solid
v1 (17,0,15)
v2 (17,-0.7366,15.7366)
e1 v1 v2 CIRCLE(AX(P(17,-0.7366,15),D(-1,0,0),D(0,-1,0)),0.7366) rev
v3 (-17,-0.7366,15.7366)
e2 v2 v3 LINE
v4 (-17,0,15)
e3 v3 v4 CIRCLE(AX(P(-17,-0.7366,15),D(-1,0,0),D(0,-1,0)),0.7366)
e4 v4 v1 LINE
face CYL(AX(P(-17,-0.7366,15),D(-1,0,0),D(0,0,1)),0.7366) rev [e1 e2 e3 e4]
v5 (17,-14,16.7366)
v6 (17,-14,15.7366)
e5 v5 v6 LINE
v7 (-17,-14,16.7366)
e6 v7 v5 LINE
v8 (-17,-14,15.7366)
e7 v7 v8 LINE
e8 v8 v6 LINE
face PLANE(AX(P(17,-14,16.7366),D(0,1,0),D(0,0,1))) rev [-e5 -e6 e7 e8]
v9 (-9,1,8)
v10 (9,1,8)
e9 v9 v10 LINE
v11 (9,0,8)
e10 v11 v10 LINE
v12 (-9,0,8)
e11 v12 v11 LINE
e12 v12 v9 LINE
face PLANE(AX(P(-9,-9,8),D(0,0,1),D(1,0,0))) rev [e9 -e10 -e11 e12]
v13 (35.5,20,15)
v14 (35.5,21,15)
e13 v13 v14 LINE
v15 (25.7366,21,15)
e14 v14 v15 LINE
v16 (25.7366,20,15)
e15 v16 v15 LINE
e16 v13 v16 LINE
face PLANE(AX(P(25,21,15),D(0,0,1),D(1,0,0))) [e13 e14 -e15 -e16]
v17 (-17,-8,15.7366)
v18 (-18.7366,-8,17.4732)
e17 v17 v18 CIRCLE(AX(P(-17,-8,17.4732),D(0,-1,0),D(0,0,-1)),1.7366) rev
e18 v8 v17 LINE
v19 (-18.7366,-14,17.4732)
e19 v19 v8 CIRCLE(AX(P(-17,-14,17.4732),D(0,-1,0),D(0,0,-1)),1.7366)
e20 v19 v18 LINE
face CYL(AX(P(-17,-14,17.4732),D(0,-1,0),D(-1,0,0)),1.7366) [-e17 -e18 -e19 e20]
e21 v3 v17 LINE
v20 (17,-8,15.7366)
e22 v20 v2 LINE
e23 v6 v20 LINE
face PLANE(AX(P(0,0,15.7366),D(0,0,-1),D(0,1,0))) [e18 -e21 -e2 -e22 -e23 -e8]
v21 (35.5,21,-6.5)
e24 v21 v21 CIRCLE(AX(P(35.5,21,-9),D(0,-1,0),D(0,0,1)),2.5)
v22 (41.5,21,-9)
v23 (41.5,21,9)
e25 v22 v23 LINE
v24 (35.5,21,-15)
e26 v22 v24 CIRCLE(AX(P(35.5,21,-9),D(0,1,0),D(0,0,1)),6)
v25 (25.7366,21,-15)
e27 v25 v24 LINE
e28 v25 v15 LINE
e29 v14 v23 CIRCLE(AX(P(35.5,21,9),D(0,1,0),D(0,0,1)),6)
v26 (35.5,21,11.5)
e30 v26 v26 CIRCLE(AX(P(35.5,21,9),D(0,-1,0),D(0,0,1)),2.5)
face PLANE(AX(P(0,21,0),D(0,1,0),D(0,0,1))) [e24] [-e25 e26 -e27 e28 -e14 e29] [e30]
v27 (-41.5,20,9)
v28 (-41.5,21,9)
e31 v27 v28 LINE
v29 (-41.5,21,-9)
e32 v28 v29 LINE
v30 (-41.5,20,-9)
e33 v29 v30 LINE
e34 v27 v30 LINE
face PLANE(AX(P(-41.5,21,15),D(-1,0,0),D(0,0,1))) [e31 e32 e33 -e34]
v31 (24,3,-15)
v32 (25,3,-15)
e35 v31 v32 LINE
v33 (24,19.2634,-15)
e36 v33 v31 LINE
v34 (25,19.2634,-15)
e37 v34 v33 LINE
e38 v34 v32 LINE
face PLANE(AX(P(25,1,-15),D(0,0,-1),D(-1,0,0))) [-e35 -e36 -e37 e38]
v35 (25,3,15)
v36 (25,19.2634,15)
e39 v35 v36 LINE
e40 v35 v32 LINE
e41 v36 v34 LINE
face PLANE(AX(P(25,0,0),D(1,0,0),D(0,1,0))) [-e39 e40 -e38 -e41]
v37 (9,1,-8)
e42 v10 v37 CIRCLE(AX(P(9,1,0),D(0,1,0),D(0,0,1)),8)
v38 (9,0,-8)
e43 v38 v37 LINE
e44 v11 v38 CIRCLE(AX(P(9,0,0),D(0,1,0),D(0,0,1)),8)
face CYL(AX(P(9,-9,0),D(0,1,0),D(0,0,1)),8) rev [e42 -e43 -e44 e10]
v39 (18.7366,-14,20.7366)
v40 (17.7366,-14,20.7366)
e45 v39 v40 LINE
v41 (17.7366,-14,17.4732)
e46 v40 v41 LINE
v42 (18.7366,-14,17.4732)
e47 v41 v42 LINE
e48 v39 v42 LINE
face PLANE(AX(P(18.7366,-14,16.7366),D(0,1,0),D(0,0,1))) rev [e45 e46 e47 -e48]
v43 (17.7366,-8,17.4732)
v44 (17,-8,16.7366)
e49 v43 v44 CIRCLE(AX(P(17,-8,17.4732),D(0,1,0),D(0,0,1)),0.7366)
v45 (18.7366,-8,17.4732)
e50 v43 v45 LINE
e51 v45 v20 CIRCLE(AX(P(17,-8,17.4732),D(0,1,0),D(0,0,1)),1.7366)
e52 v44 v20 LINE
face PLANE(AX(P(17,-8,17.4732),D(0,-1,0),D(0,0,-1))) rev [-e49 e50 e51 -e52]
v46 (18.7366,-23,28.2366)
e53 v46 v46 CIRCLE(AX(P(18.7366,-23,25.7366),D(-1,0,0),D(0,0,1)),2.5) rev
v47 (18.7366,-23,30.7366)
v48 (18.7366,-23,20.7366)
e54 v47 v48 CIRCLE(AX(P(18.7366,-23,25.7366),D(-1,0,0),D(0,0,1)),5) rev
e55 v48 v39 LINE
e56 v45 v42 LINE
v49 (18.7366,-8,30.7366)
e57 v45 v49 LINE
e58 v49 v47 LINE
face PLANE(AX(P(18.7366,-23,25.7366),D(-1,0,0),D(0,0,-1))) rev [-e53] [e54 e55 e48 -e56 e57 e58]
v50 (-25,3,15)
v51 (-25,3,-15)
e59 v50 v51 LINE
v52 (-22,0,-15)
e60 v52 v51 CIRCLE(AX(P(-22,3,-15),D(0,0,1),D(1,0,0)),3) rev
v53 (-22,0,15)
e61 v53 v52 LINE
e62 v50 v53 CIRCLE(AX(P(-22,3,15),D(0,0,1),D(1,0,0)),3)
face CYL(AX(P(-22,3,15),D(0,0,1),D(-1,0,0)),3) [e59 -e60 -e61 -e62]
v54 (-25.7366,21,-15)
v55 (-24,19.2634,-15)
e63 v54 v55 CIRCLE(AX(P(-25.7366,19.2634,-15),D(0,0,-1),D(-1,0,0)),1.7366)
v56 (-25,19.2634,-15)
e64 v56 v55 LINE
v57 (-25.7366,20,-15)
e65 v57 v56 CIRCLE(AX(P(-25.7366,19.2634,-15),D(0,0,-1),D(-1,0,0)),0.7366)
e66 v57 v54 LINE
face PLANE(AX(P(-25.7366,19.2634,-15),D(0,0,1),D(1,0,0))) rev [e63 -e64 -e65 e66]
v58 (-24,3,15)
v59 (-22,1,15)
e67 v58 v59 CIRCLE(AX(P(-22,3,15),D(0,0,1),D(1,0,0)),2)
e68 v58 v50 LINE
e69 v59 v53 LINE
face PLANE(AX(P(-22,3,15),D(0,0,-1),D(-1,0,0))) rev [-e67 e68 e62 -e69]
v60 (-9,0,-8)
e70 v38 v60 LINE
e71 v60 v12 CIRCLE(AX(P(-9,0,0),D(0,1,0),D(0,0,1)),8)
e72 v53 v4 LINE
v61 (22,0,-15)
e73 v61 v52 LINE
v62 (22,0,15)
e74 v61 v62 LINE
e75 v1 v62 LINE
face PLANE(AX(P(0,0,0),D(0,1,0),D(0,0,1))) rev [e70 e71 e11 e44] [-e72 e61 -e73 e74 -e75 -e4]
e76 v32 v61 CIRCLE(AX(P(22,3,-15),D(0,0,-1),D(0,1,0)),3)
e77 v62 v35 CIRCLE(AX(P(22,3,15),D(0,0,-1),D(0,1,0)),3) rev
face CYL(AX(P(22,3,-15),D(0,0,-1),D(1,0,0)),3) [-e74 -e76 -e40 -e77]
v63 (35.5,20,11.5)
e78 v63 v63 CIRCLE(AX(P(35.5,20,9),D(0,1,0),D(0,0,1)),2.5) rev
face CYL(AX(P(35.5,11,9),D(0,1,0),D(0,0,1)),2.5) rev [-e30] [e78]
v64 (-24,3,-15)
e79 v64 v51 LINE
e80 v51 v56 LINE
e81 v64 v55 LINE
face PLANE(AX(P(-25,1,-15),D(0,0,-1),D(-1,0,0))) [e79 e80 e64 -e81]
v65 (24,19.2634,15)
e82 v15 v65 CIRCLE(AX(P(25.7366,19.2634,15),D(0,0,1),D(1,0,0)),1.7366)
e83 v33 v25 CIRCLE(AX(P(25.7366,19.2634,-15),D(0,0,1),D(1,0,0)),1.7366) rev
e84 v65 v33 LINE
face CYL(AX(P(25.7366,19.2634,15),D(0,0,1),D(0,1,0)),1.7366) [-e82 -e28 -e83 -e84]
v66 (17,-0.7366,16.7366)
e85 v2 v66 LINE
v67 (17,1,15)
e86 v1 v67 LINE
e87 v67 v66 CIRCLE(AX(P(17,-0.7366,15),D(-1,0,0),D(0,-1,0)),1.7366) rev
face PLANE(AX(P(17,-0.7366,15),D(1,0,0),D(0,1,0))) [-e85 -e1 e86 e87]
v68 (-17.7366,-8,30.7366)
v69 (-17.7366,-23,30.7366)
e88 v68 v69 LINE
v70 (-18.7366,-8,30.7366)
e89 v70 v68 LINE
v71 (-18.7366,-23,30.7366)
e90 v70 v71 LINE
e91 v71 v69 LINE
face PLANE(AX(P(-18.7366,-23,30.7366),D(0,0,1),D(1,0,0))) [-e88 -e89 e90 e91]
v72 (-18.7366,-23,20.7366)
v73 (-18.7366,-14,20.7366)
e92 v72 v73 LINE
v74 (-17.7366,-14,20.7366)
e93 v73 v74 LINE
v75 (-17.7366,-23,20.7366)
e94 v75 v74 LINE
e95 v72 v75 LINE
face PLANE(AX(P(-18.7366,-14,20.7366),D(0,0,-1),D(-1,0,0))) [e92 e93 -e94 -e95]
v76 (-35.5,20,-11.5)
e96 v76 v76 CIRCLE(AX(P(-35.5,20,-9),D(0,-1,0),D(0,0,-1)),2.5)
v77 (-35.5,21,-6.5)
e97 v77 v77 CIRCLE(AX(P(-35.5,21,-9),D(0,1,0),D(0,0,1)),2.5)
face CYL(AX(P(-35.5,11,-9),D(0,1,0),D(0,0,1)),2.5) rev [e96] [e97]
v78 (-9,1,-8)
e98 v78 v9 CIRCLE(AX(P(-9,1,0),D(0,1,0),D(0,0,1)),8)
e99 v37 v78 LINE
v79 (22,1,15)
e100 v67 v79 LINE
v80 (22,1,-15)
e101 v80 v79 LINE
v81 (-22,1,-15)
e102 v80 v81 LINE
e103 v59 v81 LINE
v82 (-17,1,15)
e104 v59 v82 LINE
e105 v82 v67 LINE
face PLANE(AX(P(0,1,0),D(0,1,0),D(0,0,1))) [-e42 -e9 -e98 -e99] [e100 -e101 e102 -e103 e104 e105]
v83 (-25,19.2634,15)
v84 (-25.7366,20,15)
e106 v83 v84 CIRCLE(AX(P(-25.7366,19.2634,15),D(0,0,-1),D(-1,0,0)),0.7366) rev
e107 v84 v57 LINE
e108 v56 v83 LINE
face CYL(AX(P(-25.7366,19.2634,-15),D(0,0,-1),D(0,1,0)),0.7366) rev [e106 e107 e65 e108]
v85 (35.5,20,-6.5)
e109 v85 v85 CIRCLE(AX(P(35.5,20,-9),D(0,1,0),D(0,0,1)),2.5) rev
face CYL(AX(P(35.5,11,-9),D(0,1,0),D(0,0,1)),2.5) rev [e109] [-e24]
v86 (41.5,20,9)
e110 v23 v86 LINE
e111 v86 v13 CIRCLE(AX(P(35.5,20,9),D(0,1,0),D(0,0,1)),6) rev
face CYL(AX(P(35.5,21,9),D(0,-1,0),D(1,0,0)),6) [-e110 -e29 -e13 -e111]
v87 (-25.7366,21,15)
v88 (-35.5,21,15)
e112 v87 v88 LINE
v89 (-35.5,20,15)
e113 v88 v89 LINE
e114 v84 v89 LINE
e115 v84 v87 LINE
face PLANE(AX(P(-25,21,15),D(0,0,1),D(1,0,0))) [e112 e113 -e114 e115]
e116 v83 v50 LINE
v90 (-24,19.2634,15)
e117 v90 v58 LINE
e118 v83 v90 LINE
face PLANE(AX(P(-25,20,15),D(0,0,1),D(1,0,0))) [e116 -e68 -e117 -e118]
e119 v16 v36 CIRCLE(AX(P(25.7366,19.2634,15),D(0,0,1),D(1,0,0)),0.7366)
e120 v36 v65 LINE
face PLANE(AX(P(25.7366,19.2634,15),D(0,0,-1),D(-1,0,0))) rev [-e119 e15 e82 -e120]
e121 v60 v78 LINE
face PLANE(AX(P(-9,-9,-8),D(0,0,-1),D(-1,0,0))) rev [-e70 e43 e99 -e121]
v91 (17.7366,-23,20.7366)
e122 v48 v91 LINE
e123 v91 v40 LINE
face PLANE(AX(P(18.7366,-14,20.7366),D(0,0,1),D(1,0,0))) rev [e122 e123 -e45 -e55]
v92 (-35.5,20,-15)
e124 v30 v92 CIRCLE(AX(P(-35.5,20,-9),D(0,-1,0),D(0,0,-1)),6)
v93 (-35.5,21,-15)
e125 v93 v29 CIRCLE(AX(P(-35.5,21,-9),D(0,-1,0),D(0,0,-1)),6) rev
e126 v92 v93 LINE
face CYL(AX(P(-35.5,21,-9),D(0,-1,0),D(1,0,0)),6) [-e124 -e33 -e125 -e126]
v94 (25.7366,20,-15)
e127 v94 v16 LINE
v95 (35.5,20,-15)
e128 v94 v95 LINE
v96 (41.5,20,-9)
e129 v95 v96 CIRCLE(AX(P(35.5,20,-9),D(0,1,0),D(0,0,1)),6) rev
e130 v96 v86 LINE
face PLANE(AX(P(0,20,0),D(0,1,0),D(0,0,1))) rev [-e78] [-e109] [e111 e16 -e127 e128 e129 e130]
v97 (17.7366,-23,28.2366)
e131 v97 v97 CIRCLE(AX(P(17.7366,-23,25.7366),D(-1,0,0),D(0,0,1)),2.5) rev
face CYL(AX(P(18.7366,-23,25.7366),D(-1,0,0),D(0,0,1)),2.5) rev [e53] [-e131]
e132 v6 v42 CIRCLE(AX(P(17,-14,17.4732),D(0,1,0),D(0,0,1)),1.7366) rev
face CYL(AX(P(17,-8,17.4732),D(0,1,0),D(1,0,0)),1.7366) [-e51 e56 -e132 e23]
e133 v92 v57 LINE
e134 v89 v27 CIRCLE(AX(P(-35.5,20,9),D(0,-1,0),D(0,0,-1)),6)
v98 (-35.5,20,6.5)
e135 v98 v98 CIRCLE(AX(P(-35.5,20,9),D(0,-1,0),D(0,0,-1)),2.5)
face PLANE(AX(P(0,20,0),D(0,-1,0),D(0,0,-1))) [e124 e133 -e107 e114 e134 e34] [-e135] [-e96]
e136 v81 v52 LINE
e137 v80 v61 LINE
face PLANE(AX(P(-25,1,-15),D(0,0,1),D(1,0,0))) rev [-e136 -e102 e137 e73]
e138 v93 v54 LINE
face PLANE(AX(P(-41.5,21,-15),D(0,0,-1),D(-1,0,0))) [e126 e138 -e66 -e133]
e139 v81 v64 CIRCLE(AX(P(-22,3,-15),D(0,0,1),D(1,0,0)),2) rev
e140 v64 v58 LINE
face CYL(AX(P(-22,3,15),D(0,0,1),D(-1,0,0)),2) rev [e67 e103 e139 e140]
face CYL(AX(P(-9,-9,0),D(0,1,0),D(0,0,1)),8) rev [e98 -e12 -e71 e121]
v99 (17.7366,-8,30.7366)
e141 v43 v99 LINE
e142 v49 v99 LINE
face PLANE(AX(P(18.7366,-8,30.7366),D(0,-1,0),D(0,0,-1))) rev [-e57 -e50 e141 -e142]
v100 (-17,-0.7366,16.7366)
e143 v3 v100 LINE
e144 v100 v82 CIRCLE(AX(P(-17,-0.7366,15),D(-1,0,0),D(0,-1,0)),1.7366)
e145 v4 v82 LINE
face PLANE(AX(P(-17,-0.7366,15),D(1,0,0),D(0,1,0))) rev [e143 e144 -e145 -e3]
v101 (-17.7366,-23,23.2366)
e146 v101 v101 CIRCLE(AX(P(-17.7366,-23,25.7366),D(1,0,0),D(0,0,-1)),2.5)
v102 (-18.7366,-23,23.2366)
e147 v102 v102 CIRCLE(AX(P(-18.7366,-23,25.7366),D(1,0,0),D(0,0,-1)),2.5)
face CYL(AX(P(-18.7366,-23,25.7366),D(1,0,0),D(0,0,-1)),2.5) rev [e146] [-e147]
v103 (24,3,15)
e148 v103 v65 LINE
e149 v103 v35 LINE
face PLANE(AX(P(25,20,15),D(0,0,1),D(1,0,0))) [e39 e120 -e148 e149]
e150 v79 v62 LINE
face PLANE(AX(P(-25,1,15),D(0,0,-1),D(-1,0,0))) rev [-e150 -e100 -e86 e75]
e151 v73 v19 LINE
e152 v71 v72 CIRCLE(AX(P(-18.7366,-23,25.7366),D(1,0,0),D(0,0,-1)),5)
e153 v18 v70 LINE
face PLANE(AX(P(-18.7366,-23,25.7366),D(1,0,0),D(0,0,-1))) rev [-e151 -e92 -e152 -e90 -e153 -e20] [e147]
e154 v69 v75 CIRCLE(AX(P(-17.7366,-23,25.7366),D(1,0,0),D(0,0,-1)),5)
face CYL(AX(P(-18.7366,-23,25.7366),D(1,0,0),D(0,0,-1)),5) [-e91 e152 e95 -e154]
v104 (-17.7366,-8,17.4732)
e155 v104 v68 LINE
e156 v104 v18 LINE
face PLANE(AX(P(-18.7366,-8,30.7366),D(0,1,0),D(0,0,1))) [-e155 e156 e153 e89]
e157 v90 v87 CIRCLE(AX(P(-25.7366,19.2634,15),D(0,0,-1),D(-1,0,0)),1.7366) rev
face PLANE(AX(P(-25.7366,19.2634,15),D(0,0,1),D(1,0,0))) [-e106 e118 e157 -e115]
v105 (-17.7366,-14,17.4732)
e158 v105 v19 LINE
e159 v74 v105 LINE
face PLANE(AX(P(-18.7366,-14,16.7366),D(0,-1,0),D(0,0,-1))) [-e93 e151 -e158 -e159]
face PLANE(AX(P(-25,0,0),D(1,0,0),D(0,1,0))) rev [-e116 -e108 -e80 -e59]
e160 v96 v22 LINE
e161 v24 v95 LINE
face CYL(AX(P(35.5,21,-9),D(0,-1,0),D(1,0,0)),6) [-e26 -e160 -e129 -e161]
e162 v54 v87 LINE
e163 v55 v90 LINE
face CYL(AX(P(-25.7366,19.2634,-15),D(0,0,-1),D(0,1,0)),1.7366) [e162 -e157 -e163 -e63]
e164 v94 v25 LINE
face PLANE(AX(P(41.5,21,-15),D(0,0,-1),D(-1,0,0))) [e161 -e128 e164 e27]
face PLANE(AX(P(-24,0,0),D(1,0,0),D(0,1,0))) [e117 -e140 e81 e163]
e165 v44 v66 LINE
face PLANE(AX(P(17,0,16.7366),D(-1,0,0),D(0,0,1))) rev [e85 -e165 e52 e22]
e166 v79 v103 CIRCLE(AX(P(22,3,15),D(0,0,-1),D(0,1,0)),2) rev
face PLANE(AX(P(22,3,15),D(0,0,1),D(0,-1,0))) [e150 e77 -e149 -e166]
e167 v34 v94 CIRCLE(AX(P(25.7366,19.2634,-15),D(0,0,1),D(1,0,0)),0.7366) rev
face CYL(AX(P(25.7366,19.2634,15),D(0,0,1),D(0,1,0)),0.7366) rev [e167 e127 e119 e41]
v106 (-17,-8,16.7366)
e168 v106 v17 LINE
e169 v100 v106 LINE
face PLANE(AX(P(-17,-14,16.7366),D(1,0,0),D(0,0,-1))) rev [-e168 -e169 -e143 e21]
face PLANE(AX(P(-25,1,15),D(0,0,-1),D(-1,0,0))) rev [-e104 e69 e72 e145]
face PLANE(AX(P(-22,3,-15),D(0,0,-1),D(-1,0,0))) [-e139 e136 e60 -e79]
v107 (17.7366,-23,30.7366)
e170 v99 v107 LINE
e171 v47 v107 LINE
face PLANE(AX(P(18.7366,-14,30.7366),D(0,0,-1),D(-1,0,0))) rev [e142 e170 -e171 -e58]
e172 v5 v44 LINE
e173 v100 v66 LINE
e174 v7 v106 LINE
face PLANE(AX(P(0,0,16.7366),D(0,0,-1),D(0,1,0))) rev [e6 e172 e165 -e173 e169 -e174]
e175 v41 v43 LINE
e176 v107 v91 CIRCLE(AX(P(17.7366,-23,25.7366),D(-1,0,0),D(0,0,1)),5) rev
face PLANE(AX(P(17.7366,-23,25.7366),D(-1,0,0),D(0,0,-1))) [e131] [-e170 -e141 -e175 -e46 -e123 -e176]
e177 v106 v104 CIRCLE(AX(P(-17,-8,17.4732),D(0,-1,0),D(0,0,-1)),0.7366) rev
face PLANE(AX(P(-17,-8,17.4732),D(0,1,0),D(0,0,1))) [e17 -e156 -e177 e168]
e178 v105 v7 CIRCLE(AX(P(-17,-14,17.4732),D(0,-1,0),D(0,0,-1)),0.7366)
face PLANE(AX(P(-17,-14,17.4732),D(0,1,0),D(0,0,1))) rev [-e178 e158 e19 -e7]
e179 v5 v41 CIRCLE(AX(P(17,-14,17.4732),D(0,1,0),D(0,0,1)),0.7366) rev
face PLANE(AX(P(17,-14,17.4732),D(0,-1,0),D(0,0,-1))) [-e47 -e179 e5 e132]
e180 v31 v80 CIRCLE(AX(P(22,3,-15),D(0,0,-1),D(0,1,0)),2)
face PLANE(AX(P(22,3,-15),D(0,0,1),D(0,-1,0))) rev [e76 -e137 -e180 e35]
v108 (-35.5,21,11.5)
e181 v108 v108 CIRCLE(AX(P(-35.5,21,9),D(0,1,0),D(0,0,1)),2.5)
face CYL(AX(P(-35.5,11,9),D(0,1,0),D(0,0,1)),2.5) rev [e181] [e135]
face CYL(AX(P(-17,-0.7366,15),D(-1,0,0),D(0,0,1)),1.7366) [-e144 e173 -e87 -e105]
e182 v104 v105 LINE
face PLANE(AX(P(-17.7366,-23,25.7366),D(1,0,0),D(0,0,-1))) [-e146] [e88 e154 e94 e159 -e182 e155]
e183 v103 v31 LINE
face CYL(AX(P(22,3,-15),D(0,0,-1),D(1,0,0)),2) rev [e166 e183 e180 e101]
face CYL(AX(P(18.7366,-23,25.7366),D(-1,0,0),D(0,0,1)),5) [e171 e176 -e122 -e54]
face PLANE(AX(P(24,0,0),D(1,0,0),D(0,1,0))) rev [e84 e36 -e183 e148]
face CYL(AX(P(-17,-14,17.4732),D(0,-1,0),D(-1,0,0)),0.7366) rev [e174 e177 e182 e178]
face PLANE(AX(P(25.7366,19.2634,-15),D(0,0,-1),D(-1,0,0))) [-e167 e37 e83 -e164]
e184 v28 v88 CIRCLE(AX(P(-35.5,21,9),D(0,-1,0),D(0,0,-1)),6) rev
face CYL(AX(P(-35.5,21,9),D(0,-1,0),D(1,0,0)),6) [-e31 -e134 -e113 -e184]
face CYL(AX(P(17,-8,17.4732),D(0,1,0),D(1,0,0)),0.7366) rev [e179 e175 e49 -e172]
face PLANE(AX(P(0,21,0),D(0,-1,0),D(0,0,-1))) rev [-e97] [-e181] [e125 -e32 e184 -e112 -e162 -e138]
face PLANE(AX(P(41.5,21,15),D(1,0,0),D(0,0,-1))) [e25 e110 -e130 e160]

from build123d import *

# Parameters (mm, degrees)
SKETCH1_W                      = 50
SKETCH1_H                      = 30
BASE_FLANGE1_DEPTH             = 1
EDGE_FLANGE1_STRIP_W           = 8
EDGE_FLANGE1_STRIP_H           = 1
EDGE_FLANGE1_STRIP_CUT_DEPTH   = 30
EDGE_FLANGE1_STRIP_2_W         = 8
EDGE_FLANGE1_STRIP_2_H         = 1
EDGE_FLANGE1_STRIP_CUT_2_DEPTH = 30
EDGE_FLANGE1_DEPTH             = 30
EDGE_FLANGE1_BEND_DEPTH        = 30
EDGE_FLANGE2_STRIP_W           = 5.4732
EDGE_FLANGE2_STRIP_H           = 1
EDGE_FLANGE2_STRIP_CUT_DEPTH   = 30
EDGE_FLANGE2_STRIP_2_W         = 5.4732
EDGE_FLANGE2_STRIP_2_H         = 1
EDGE_FLANGE2_STRIP_CUT_2_DEPTH = 30
EDGE_FLANGE2_DEPTH             = 30
EDGE_FLANGE2_BEND_DEPTH        = 30
BREAK_CORNER1_START            = 20
BREAK_CORNER1_DEPTH            = 1
CUT_EXTRUDE1_DEPTH             = 10
SKETCH25_R                     = 2.5
CUT_EXTRUDE2_DEPTH             = 10
EDGE_FLANGE3_DEPTH             = 34
EDGE_FLANGE4_DEPTH             = 6
EDGE_FLANGE4_START             = -1
EDGE_FLANGE4_PROFILE_R         = 2.5
EDGE_FLANGE4_FLAT_DEPTH        = 1


# Read off the part's stored shape, not the designer's step: Break-Corner1
# Sheet-metal steps are written as plain solids
with BuildPart() as part:
    # Sketch1 → Base-Flange1 (new body)
    with BuildSketch(Plane(origin=(0, 0, 0), x_dir=(1, 0, 0), z_dir=(0, 1, 0))):
        Rectangle(SKETCH1_W, SKETCH1_H)
    extrude(amount=BASE_FLANGE1_DEPTH)

    # Edge-Flange1 strip (across the edge) → Edge-Flange1 strip cut (cut)
    with BuildSketch(Plane(origin=(25, 1, 15), x_dir=(-1, 0, 0), z_dir=(0, 0, -1))):
        with Locations((-1, -0.5)):
            Rectangle(EDGE_FLANGE1_STRIP_W, EDGE_FLANGE1_STRIP_H)
    extrude(amount=EDGE_FLANGE1_STRIP_CUT_DEPTH, mode=Mode.SUBTRACT)

    # Edge-Flange1 strip 2 (across the edge) → Edge-Flange1 strip cut 2 (cut)
    with BuildSketch(Plane(origin=(-25, 1, -15), x_dir=(1, 0, 0), z_dir=(0, 0, 1))):
        with Locations((-1, -0.5)):
            Rectangle(EDGE_FLANGE1_STRIP_2_W, EDGE_FLANGE1_STRIP_2_H)
    extrude(amount=EDGE_FLANGE1_STRIP_CUT_2_DEPTH, mode=Mode.SUBTRACT)

    # Edge-Flange1 section (across the edge) → Edge-Flange1 (add)
    with BuildSketch(Plane(origin=(25, 1, 15), x_dir=(-1, 0, 0), z_dir=(0, 0, -1))):
        with BuildLine():
            Line((0, 2), (0, 19))
            Line((0, 19), (1, 19))
            Line((1, 19), (1, 2))
            ThreePointArc((1, 2), (1.585786438, 0.585786438), (3, 0))
            Line((3, 0), (3, -1))
            ThreePointArc((3, -1), (0.878679656, -0.121320344), (0, 2))
        make_face()
    extrude(amount=EDGE_FLANGE1_DEPTH)

    # Edge-Flange1 section 2 (across the edge) → Edge-Flange1 bend (add)
    with BuildSketch(Plane(origin=(-25, 1, -15), x_dir=(1, 0, 0), z_dir=(0, 0, 1))):
        with BuildLine():
            Line((0, 2), (0, 19))
            Line((0, 19), (1, 19))
            Line((1, 19), (1, 2))
            ThreePointArc((1, 2), (1.585786438, 0.585786438), (3, 0))
            Line((3, 0), (3, -1))
            ThreePointArc((3, -1), (0.878679656, -0.121320344), (0, 2))
        make_face()
    extrude(amount=EDGE_FLANGE1_BEND_DEPTH)

    # Edge-Flange2 strip (across the edge) → Edge-Flange2 strip cut (cut)
    with BuildSketch(Plane(origin=(25, 20, -15), x_dir=(0, -1, 0), z_dir=(0, 0, 1))):
        with Locations((-2, -0.5)):
            Rectangle(EDGE_FLANGE2_STRIP_W, EDGE_FLANGE2_STRIP_H)
    extrude(amount=EDGE_FLANGE2_STRIP_CUT_DEPTH, mode=Mode.SUBTRACT)

    # Edge-Flange2 strip 2 (across the edge) → Edge-Flange2 strip cut 2 (cut)
    with BuildSketch(Plane(origin=(-25, 20, 15), x_dir=(0, -1, 0), z_dir=(0, 0, -1))):
        with Locations((-2, -0.5)):
            Rectangle(EDGE_FLANGE2_STRIP_2_W, EDGE_FLANGE2_STRIP_2_H)
    extrude(amount=EDGE_FLANGE2_STRIP_CUT_2_DEPTH, mode=Mode.SUBTRACT)

    # Edge-Flange2 section (across the edge) → Edge-Flange2 (add)
    with BuildSketch(Plane(origin=(25, 20, -15), x_dir=(0, -1, 0), z_dir=(0, 0, 1))):
        with BuildLine():
            Line((-1, 0.7366), (-1, 16.5))
            Line((-1, 16.5), (0, 16.5))
            Line((0, 16.5), (0, 0.7366))
            ThreePointArc((0, 0.7366), (0.215745145, 0.215745145), (0.7366, 0))
            Line((0.7366, 0), (0.7366, -1))
            ThreePointArc((0.7366, -1), (-0.491361636, -0.491361636), (-1, 0.7366))
        make_face()
    extrude(amount=EDGE_FLANGE2_DEPTH)

    # Edge-Flange2 section 2 (across the edge) → Edge-Flange2 bend (add)
    with BuildSketch(Plane(origin=(-25, 20, 15), x_dir=(0, -1, 0), z_dir=(0, 0, -1))):
        with BuildLine():
            Line((-1, 0.7366), (-1, 16.5))
            Line((-1, 16.5), (0, 16.5))
            Line((0, 16.5), (0, 0.7366))
            ThreePointArc((0, 0.7366), (0.215745145, 0.215745145), (0.7366, 0))
            Line((0.7366, 0), (0.7366, -1))
            ThreePointArc((0.7366, -1), (-0.491361636, -0.491361636), (-1, 0.7366))
        make_face()
    extrude(amount=EDGE_FLANGE2_BEND_DEPTH)

    # Break-Corner1 outline → Break-Corner1 (cut)
    with BuildSketch(Plane(origin=(0, 0, 0), x_dir=(1, 0, 0), z_dir=(0, 1, 0)).offset(BREAK_CORNER1_START)):
        with BuildLine():
            Line((41.5, -15), (41.5, -9))
            ThreePointArc((41.5, -9), (39.742640687, -13.242640687), (35.5, -15))
            Line((35.5, -15), (41.5, -15))
        make_face()
        with BuildLine():
            ThreePointArc((35.5, 15), (39.742640687, 13.242640687), (41.5, 9))
            Line((41.5, 9), (41.5, 15))
            Line((41.5, 15), (35.5, 15))
        make_face()
        with BuildLine():
            Line((-41.5, -15), (-35.5, -15))
            ThreePointArc((-35.5, -15), (-39.742640687, -13.242640687), (-41.5, -9))
            Line((-41.5, -9), (-41.5, -15))
        make_face()
        with BuildLine():
            Line((-41.5, 15), (-41.5, 9))
            ThreePointArc((-41.5, 9), (-39.742640687, 13.242640687), (-35.5, 15))
            Line((-35.5, 15), (-41.5, 15))
        make_face()
    extrude(amount=BREAK_CORNER1_DEPTH, mode=Mode.SUBTRACT)

    # Sketch24 → Cut-Extrude1 (cut)
    with BuildSketch(Plane(origin=(0, 1, 0), x_dir=(1, 0, 0), z_dir=(0, 1, 0))):
        with BuildLine():
            Line((-9, 8), (9, 8))
            ThreePointArc((9, 8), (17, 0), (9, -8))
            Line((9, -8), (-9, -8))
            ThreePointArc((-9, -8), (-17, 0), (-9, 8))
        make_face()
    extrude(amount=-CUT_EXTRUDE1_DEPTH, mode=Mode.SUBTRACT)

    # Sketch25 → Cut-Extrude2 (cut)
    with BuildSketch(Plane(origin=(0, 21, 0), x_dir=(1, 0, 0), z_dir=(0, 1, 0))):
        with Locations(Location((-35.5, 9, 0), (0, 0, 270))):
            Circle(SKETCH25_R)
        with Locations(Location((-35.5, -9, 0), (0, 0, 270))):
            Circle(SKETCH25_R)
    cut_extrude2 = extrude(amount=-CUT_EXTRUDE2_DEPTH, mode=Mode.SUBTRACT)

    # Mirror1: Cut-Extrude2 across plane
    add(cut_extrude2.mirror(Plane(origin=(0, 0, 0), x_dir=(0, 0, 1), z_dir=(1, 0, 0))), mode=Mode.SUBTRACT)

    # Edge-Flange3 section (across the edge) → Edge-Flange3 (add)
    with BuildSketch(Plane(origin=(17, 0, 15.7366), x_dir=(0, 0, -1), z_dir=(-1, 0, 0))):
        with BuildLine():
            Line((-1, 0.7366), (-1, 14))
            Line((-1, 14), (0, 14))
            Line((0, 14), (0, 0.7366))
            ThreePointArc((0, 0.7366), (0.215745145, 0.215745145), (0.7366, 0))
            Line((0.7366, 0), (0.7366, -1))
            ThreePointArc((0.7366, -1), (-0.491361636, -0.491361636), (-1, 0.7366))
        make_face()
    extrude(amount=EDGE_FLANGE3_DEPTH)

    # Edge-Flange4 bend section (across the edge) → Edge-Flange4 (add)
    with BuildSketch(Plane(origin=(-17.7366, -8, 16.7366), x_dir=(1, 0, 0), z_dir=(0, -1, 0))):
        with BuildLine():
            Line((-1, 0.7366), (0, 0.7366))
            ThreePointArc((0, 0.7366), (0.215745145, 0.215745145), (0.7366, 0))
            Line((0.7366, 0), (0.7366, -1))
            ThreePointArc((0.7366, -1), (-0.491361636, -0.491361636), (-1, 0.7366))
        make_face()
    edge_flange4 = extrude(amount=EDGE_FLANGE4_DEPTH)

    # Edge-Flange4 profile (on flange) → Edge-Flange4 flat (add)
    with BuildSketch(Plane(origin=(-17.7366, 0, 16.7366), x_dir=(0, 1, 0), z_dir=(1, 0, 0)).offset(EDGE_FLANGE4_START)):
        with BuildLine():
            ThreePointArc((-23, 14), (-28, 9), (-23, 4))
            Line((-23, 4), (-14, 4))
            Line((-14, 4), (-14, 0.7366))
            Line((-14, 0.7366), (-8, 0.7366))
            Line((-8, 0.7366), (-8, 14))
            Line((-8, 14), (-14, 14))
            Line((-14, 14), (-23, 14))
        make_face()
        with Locations((-23, 9)):
            Circle(EDGE_FLANGE4_PROFILE_R, mode=Mode.SUBTRACT)
    edge_flange4_flat = extrude(amount=EDGE_FLANGE4_FLAT_DEPTH)

    # Mirror2: Edge-Flange4, Edge-Flange4 flat across plane
    add(edge_flange4.mirror(Plane(origin=(0, 0, 0), x_dir=(0, 0, 1), z_dir=(1, 0, 0))))
    add(edge_flange4_flat.mirror(Plane(origin=(0, 0, 0), x_dir=(0, 0, 1), z_dir=(1, 0, 0))))


solid = part.part
